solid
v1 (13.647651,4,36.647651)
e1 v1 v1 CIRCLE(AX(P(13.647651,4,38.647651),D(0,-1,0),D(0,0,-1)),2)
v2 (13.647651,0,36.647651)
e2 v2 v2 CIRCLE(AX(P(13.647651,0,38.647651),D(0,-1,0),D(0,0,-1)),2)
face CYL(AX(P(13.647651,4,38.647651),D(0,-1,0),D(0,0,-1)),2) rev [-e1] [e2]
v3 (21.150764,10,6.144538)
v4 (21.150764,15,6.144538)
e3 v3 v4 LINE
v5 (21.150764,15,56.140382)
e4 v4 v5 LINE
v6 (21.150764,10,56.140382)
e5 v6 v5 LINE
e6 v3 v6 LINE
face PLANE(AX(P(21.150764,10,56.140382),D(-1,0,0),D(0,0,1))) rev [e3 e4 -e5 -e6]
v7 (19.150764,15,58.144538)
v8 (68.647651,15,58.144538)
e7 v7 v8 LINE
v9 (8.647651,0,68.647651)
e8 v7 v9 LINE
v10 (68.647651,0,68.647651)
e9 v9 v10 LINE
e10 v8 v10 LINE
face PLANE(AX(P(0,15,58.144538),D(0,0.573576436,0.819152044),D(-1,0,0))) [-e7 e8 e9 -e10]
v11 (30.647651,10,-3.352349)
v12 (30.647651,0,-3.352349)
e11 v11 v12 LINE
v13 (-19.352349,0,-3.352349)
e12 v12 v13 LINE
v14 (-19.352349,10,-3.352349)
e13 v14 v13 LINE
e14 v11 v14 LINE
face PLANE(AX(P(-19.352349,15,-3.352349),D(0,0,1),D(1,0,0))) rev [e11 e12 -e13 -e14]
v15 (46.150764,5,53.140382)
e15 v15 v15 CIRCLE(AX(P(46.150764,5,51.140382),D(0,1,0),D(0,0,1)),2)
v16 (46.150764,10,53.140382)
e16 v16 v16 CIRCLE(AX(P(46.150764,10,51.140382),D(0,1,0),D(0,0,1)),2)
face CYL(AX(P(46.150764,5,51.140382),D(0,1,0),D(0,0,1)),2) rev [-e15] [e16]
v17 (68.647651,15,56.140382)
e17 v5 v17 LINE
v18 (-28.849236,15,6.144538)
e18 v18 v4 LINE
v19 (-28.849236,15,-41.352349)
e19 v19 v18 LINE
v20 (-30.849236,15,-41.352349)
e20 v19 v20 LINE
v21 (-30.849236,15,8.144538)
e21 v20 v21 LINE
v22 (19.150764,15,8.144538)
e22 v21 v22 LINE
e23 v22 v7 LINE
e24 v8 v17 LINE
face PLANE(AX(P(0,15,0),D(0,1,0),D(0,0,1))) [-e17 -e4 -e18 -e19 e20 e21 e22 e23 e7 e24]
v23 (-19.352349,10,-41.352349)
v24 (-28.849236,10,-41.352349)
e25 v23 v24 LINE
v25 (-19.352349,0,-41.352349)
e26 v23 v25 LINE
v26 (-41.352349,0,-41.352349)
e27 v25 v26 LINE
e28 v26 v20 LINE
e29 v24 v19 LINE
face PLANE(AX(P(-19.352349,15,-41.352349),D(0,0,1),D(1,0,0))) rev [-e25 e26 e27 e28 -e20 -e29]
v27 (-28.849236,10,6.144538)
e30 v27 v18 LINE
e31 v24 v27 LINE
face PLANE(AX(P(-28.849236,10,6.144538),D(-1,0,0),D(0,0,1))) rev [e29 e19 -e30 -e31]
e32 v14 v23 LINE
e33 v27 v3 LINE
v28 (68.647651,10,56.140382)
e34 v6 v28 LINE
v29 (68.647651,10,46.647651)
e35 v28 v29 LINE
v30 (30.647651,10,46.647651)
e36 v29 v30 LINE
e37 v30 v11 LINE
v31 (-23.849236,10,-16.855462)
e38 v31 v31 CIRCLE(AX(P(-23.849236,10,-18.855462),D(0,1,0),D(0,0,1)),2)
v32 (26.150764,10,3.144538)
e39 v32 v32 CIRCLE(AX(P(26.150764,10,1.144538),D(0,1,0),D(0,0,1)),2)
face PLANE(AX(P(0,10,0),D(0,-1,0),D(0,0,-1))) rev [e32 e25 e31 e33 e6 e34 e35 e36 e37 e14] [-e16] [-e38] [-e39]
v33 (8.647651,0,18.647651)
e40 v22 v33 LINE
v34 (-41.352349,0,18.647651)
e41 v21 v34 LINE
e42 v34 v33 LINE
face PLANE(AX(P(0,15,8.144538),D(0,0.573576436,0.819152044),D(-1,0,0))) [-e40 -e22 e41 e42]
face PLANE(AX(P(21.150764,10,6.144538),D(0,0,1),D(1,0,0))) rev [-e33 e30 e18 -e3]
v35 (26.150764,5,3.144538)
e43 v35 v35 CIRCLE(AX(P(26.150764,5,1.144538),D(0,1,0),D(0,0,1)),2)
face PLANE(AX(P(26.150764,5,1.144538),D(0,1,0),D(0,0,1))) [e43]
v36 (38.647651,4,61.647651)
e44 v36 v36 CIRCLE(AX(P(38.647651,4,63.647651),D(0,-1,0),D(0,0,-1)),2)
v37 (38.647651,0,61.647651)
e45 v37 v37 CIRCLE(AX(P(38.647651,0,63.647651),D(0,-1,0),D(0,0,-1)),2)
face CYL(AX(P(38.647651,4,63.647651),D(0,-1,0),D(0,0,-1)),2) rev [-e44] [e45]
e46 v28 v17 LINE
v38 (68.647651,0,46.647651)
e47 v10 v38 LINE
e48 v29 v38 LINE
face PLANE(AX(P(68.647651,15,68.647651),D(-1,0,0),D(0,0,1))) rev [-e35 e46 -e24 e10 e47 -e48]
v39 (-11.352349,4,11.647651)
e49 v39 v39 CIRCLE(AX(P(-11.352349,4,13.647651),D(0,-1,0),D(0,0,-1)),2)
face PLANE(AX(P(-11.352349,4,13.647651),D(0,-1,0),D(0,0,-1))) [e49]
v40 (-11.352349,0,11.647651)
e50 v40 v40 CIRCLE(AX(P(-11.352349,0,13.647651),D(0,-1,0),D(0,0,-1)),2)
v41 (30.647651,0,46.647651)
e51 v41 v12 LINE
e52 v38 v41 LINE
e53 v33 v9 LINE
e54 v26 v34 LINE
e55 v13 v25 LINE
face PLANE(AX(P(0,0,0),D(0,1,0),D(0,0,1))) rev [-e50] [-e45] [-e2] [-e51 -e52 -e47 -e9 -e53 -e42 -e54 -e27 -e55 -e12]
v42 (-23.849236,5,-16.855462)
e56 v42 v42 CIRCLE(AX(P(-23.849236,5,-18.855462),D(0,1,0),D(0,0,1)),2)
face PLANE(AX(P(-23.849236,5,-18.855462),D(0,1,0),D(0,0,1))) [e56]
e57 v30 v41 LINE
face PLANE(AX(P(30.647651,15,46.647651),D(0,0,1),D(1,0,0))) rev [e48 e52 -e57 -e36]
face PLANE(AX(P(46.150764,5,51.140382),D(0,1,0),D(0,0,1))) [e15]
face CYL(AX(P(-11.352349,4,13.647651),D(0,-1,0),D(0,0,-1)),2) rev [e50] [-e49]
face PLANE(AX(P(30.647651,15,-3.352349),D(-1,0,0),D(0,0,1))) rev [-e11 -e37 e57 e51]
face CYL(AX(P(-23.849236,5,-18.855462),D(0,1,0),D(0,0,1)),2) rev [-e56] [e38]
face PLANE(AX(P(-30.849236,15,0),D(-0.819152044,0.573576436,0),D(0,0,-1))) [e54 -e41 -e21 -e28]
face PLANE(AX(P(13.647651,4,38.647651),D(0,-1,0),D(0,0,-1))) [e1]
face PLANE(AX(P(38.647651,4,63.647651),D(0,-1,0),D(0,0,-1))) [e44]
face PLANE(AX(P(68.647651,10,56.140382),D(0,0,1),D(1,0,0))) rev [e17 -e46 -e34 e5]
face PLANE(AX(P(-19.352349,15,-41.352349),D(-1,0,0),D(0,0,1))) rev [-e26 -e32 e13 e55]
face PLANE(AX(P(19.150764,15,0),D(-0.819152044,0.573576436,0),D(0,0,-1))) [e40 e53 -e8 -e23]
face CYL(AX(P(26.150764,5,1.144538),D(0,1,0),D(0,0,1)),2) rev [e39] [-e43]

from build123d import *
from OCP.BRepFilletAPI import BRepFilletAPI_MakeChamfer

# Parameters (mm, degrees)
BOSS_EXTRU_1_DEPTH      = 15
CHANFREIN1_SIZE         = 15
CHANFREIN1_SIZE_2       = 10.503113073
ESQUISSE4_R             = 2
ENL_V_MAT_EXTRU_3_DEPTH = 4
ENL_V_MAT_EXTRU_5_DEPTH = 5
ESQUISSE6_R             = 2
ENL_V_MAT_EXTRU_6_DEPTH = 5


with BuildPart() as part:
    # Esquisse1 → Boss.-Extru.1 (new body)
    with BuildSketch(Plane(origin=(0, 0, 0), x_dir=(1, 0, 0), z_dir=(0, 1, 0))):
        Polygon((-41.352348911, -18.647651089), (8.647651089, -18.647651089), (8.647651089, -68.647651089), (68.647651089, -68.647651089), (68.647651089, -46.647651089), (30.647651089, -46.647651089), (30.647651089, 3.352348911), (-19.352348911, 3.352348911), (-19.352348911, 41.352348911), (-41.352348911, 41.352348911), align=None)
    extrude(amount=BOSS_EXTRU_1_DEPTH)

    # Chanfrein1
    chanfrein1_edges_1 = [part.edges().sort_by_distance(p)[0] for p in [
        (38.647651089, 15, 68.647651089),
    ]]
    chanfrein1_side_1 = [part.faces().sort_by_distance(p)[0] for p in [
        (38.647651089, 14.789937739, 68.647651089),
    ]]
    chanfrein1_edges_2 = [part.edges().sort_by_distance(p)[0] for p in [
        (8.647651089, 15, 43.647651089),
    ]]
    chanfrein1_side_2 = [part.faces().sort_by_distance(p)[0] for p in [
        (8.647651089, 14.789937739, 43.647651089),
    ]]
    chanfrein1_edges_3 = [part.edges().sort_by_distance(p)[0] for p in [
        (-16.352348911, 15, 18.647651089),
    ]]
    chanfrein1_side_3 = [part.faces().sort_by_distance(p)[0] for p in [
        (-16.352348911, 14.789937739, 18.647651089),
    ]]
    chanfrein1_edges_4 = [part.edges().sort_by_distance(p)[0] for p in [
        (-41.352348911, 15, -11.352348911),
    ]]
    chanfrein1_side_4 = [part.faces().sort_by_distance(p)[0] for p in [
        (-41.352348911, 14.789937739, -11.352348911),
    ]]
    chanfrein1 = BRepFilletAPI_MakeChamfer(part.part.solid().wrapped)
    for e in chanfrein1_edges_1:
        chanfrein1.Add(CHANFREIN1_SIZE - 0.0001, CHANFREIN1_SIZE_2 - 0.0001, e.wrapped, chanfrein1_side_1[0].wrapped)
    for e in chanfrein1_edges_2:
        chanfrein1.Add(CHANFREIN1_SIZE - 0.0001, CHANFREIN1_SIZE_2 - 0.0001, e.wrapped, chanfrein1_side_2[0].wrapped)
    for e in chanfrein1_edges_3:
        chanfrein1.Add(CHANFREIN1_SIZE - 0.0001, CHANFREIN1_SIZE_2 - 0.0001, e.wrapped, chanfrein1_side_3[0].wrapped)
    for e in chanfrein1_edges_4:
        chanfrein1.Add(CHANFREIN1_SIZE - 0.0001, CHANFREIN1_SIZE_2 - 0.0001, e.wrapped, chanfrein1_side_4[0].wrapped)
    add(Compound.cast(chanfrein1.Shape()), mode=Mode.REPLACE)  # a hair under: the kernel refuses the full size

    # Esquisse4 → Enlèv. mat.-Extru.3 (cut)
    with BuildSketch(Plane.XZ):
        with Locations(Location((38.647651089, 63.647651089, 0), (0, 0, 270))):
            Circle(ESQUISSE4_R)
        with Locations(Location((13.647651089, 38.647651089, 0), (0, 0, 270))):
            Circle(ESQUISSE4_R)
        with Locations(Location((-11.352348911, 13.647651089, 0), (0, 0, 270))):
            Circle(ESQUISSE4_R)
    extrude(amount=-ENL_V_MAT_EXTRU_3_DEPTH, mode=Mode.SUBTRACT)

    # Esquisse5 → Enlèv. mat.-Extru.5 (cut)
    with BuildSketch(Plane(origin=(0, 15, 0), x_dir=(1, 0, 0), z_dir=(0, 1, 0))):
        Polygon((-28.849235838, 41.352348911), (-19.352348911, 41.352348911), (-19.352348911, 3.352348911), (30.647651089, 3.352348911), (30.647651089, -46.647651089), (68.647651089, -46.647651089), (68.647651089, -56.140382231), (21.150764162, -56.140382231), (21.150764162, -6.144538016), (-28.849235838, -6.144538016), align=None)
    extrude(amount=-ENL_V_MAT_EXTRU_5_DEPTH, mode=Mode.SUBTRACT)

    # Esquisse6 → Enlèv. mat.-Extru.6 (cut)
    with BuildSketch(Plane(origin=(0, 10, 0), x_dir=(1, 0, 0), z_dir=(0, 1, 0))):
        with Locations(Location((-23.849235838, 18.855461984, 0), (0, 0, 270))):
            Circle(ESQUISSE6_R)
        with Locations(Location((26.150764162, -1.144538016, 0), (0, 0, 270))):
            Circle(ESQUISSE6_R)
        with Locations(Location((46.150764162, -51.140382231, 0), (0, 0, 270))):
            Circle(ESQUISSE6_R)
    extrude(amount=-ENL_V_MAT_EXTRU_6_DEPTH, mode=Mode.SUBTRACT)


solid = part.part
